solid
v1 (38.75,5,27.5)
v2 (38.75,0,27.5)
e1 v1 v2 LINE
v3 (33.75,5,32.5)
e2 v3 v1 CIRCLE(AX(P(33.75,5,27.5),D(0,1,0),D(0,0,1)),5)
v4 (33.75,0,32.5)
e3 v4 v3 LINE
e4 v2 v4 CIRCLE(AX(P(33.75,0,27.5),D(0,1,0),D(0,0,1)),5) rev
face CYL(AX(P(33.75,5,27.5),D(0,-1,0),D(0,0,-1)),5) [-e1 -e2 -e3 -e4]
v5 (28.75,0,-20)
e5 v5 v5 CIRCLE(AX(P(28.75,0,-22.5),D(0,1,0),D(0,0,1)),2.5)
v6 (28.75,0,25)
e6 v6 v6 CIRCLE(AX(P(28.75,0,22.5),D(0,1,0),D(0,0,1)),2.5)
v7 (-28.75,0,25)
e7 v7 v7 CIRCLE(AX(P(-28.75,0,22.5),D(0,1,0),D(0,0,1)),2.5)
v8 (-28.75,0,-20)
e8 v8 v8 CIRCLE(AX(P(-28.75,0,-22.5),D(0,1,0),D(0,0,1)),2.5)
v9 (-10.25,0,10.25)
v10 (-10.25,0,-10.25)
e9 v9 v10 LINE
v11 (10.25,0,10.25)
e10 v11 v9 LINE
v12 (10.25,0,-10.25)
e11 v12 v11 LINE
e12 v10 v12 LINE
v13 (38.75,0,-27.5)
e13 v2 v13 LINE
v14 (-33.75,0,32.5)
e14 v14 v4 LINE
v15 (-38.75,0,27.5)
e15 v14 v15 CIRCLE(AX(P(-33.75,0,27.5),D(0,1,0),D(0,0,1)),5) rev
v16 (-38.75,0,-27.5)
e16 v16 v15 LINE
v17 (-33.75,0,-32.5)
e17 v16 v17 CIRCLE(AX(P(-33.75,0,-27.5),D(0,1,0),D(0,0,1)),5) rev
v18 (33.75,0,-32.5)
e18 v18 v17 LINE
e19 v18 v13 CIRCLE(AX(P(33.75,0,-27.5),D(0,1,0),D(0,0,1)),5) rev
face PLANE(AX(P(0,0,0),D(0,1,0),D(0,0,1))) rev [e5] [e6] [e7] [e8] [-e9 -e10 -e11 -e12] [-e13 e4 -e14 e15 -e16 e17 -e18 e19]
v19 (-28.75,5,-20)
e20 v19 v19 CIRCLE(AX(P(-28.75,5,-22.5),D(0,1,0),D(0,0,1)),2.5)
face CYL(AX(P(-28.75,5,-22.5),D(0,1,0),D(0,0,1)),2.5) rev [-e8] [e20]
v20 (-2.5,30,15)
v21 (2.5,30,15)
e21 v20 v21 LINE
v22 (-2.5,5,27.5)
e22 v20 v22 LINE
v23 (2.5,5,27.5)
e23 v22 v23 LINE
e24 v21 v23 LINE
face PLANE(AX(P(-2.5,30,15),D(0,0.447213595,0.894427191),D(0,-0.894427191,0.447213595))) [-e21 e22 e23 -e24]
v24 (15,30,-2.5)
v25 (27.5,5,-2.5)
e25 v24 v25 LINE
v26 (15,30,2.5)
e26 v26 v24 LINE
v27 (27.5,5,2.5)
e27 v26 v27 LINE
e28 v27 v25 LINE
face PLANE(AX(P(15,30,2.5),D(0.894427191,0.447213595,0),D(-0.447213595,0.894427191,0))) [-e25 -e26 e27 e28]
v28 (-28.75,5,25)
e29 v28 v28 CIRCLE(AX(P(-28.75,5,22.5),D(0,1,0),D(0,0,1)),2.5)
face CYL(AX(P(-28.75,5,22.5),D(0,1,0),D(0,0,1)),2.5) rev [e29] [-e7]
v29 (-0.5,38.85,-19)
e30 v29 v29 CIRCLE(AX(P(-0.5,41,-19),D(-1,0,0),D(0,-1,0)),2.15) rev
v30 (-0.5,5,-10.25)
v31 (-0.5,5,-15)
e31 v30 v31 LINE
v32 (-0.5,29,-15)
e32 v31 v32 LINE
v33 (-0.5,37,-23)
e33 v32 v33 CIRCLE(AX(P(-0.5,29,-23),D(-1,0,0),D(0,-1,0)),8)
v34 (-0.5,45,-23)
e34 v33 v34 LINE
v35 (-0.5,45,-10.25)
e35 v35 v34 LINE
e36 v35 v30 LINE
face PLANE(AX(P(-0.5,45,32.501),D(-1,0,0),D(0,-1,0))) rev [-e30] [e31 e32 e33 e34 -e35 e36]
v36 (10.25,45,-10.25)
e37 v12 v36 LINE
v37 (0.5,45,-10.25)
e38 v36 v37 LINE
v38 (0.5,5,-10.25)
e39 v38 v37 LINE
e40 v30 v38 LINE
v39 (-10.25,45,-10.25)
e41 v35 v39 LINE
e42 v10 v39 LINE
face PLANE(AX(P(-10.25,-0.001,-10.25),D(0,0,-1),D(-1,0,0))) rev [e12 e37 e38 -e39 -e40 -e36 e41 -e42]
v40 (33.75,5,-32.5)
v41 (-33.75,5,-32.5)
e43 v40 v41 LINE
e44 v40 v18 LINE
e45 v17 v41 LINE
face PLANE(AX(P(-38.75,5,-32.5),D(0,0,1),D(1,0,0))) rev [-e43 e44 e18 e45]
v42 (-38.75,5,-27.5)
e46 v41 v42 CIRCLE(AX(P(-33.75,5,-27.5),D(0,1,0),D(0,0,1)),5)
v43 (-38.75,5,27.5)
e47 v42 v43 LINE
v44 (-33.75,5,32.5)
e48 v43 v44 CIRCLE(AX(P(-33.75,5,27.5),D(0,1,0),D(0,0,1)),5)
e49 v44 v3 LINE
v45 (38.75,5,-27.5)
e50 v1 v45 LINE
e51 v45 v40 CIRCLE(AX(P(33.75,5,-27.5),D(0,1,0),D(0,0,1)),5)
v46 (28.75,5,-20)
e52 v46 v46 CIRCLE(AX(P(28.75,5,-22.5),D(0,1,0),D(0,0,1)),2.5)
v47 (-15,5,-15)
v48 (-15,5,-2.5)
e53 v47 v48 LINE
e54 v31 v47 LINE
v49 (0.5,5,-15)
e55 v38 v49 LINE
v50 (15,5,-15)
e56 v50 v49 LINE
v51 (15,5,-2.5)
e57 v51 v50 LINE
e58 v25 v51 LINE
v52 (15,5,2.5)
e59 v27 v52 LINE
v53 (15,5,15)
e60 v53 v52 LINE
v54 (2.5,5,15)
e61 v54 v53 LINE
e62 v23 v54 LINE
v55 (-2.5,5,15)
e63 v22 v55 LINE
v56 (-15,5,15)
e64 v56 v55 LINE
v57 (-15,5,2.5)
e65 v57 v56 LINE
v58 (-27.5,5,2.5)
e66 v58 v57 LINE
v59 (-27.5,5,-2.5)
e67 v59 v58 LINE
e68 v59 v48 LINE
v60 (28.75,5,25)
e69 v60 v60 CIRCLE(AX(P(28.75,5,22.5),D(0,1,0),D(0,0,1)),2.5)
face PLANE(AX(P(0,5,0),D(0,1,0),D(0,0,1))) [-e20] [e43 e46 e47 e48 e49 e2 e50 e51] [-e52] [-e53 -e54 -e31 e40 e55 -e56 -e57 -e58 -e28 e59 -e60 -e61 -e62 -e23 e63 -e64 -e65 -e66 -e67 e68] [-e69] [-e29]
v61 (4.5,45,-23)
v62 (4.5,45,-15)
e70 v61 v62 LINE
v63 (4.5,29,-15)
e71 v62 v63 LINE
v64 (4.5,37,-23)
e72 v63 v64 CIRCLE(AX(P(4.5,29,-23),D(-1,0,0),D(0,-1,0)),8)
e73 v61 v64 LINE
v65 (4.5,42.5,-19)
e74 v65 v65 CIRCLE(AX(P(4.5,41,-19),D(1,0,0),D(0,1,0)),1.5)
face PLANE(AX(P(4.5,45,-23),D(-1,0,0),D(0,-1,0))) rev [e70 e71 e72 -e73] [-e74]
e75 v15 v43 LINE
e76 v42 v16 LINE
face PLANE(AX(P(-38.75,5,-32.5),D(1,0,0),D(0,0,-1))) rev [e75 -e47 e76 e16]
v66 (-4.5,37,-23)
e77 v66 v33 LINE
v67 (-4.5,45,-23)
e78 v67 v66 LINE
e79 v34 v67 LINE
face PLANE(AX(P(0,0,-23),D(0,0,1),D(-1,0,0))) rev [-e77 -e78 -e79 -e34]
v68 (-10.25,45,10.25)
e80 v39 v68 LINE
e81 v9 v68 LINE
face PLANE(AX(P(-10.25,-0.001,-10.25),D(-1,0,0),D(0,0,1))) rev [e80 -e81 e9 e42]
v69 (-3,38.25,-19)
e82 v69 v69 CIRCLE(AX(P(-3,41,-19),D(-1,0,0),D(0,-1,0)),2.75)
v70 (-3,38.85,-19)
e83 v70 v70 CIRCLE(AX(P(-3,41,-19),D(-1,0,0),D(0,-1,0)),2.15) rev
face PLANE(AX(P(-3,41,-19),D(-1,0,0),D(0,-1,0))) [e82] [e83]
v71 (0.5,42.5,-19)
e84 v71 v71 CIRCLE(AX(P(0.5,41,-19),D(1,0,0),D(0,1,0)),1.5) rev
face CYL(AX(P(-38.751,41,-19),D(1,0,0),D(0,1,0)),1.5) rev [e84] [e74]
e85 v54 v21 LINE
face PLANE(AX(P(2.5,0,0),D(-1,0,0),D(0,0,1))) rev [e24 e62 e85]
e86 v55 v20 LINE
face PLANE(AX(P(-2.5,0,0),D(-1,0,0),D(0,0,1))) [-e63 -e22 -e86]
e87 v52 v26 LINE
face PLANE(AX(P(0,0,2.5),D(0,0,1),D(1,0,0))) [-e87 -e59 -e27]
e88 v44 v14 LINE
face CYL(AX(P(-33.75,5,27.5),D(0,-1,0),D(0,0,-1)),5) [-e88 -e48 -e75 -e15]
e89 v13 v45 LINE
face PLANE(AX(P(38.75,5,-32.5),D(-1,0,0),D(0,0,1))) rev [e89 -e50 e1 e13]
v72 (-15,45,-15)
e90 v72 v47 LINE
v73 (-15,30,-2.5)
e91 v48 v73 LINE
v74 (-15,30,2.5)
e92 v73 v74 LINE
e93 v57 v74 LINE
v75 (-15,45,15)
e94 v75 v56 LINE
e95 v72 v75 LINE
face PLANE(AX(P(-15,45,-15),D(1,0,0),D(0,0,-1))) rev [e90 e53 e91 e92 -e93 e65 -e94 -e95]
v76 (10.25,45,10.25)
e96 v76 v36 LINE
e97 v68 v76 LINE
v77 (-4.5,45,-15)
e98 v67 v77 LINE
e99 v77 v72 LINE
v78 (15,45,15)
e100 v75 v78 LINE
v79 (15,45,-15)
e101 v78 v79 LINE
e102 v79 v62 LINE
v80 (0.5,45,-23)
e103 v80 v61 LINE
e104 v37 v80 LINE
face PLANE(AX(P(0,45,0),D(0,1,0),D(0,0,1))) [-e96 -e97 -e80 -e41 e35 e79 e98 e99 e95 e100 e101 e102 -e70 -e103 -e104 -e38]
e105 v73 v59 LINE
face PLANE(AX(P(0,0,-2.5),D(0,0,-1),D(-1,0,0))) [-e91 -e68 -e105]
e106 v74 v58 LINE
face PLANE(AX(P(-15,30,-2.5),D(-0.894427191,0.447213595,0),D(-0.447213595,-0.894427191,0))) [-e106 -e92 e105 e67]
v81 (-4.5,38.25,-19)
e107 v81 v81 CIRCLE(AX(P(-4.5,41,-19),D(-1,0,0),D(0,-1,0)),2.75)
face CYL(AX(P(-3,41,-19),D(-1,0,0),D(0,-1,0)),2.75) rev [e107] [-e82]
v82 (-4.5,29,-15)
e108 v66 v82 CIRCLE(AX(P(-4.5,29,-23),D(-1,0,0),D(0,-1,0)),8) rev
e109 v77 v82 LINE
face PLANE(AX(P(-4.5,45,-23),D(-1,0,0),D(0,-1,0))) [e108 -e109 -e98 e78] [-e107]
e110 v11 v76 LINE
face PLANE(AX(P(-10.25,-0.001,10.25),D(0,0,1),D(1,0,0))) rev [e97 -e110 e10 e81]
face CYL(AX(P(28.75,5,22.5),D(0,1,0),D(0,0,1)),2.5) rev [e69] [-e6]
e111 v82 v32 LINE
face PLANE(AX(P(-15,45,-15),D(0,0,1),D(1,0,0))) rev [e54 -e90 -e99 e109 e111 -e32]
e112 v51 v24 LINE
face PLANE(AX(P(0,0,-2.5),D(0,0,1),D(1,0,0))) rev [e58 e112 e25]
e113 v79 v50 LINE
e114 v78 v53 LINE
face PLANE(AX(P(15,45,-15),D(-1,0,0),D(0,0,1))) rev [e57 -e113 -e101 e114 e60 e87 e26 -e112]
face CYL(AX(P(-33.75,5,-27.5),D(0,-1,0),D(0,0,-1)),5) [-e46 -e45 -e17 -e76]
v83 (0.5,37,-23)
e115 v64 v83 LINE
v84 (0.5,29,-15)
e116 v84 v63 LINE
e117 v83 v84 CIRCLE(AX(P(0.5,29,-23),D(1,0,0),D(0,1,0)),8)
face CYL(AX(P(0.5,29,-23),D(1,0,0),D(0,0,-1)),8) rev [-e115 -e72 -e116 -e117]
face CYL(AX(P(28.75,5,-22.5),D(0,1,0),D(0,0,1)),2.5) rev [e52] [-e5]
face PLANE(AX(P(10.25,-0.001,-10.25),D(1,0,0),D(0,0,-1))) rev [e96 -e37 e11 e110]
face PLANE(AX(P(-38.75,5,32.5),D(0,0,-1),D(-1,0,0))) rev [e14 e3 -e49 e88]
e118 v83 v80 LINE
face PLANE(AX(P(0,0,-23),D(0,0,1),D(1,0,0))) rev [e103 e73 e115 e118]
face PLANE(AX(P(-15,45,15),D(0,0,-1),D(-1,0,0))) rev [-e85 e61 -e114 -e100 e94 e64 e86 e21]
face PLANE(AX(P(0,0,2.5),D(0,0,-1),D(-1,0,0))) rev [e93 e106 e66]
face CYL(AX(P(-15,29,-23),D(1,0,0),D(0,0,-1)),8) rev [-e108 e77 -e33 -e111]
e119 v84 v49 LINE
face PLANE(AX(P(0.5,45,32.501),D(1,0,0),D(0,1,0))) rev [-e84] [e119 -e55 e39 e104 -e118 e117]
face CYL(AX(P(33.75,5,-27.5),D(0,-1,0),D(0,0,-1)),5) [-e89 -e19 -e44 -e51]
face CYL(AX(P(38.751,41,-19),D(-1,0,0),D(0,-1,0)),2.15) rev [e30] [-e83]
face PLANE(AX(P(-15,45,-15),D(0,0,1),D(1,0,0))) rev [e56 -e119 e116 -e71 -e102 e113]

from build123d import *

# Parameters (mm, degrees)
SKETCH1_W                = 77.5
SKETCH1_H                = 65
BOSS_EXTRUDE1_DEPTH      = 5
F_5_0_5_DIAMETER_HOLE1_D = 5
SKETCH4_W                = 30
SKETCH4_H                = 30
BOSS_EXTRUDE2_DEPTH      = 40
CUT_EXTRUDE1_REACH       = 69.696
SKETCH5_W                = 20.5
SKETCH5_H                = 20.5
BOSS_EXTRUDE3_DEPTH      = 2.5
CIRPATTERN1_COUNT        = 2
CIRPATTERN1_ANGLE        = 90
CIRPATTERN2_COUNT        = 2
CIRPATTERN2_ANGLE        = 90
CUT_EXTRUDE4_REACH       = 78.045
SKETCH11_W               = 1
SKETCH11_H               = 40
SKETCH12_W               = 4
SKETCH12_H               = 8
BOSS_EXTRUDE5_DEPTH      = 8
FILLET3_R                = 8
FILLET3_OF_MIRROR2_R     = 8
CUT_EXTRUDE5_REACH       = 72.369
SKETCH13_R               = 2.15
SKETCH14_R               = 2.75
CUT_EXTRUDE6_DEPTH       = 1.5
CUT_EXTRUDE7_REACH       = 72.369
SKETCH15_R               = 1.5
FILLET1_R                = 5


with BuildPart() as part:
    # Sketch1 → Boss-Extrude1 (new body)
    with BuildSketch(Plane(origin=(0, 0, 0), x_dir=(1, 0, 0), z_dir=(0, 1, 0))):
        Rectangle(SKETCH1_W, SKETCH1_H)
    extrude(amount=BOSS_EXTRUDE1_DEPTH)

    # Ø5.0 (5) Diameter Hole1 (through all)
    with Locations(Plane(origin=(-28.75, 5, -22.5), x_dir=(0, 0, 1), z_dir=(0, 1, 0))):
        with Locations((0, 0), (0, 57.5), (45, 57.5), (45, 0)):
            Hole(F_5_0_5_DIAMETER_HOLE1_D / 2)

    # Sketch4 → Boss-Extrude2 (add)
    with BuildSketch(Plane(origin=(0, 5, 0), x_dir=(1, 0, 0), z_dir=(0, 1, 0))):
        Rectangle(SKETCH4_W, SKETCH4_H)
    extrude(amount=BOSS_EXTRUDE2_DEPTH)

    # Sketch5 → Cut-Extrude1 (cut, up to next)
    with BuildSketch(Plane(origin=(0, 45, 0), x_dir=(1, 0, 0), z_dir=(0, 1, 0)), mode=Mode.PRIVATE) as cut_extrude1_sk1:
        Rectangle(SKETCH5_W, SKETCH5_H)
    cut_extrude1_tool1 = extrude(cut_extrude1_sk1.sketch, amount=-CUT_EXTRUDE1_REACH, mode=Mode.PRIVATE) & part.part
    add(cut_extrude1_tool1.solids().sort_by_distance((0, 45, 0))[0], mode=Mode.SUBTRACT)

    # Sketch7 → Boss-Extrude3 (add, symmetric)
    with BuildSketch(Plane(origin=(0, 0, 0), x_dir=(0, 0, -1), z_dir=(1, 0, 0))):
        Polygon((-15, 30), (-27.5, 5), (-15, 5), align=None)
    boss_extrude3 = extrude(amount=BOSS_EXTRUDE3_DEPTH, both=True)

    # CirPattern1: Boss-Extrude3 ×2 about axis
    cirpattern1_axis = Axis((0, 0, 0), (0, 1, 0))
    for i in range(1, CIRPATTERN1_COUNT):
        add(boss_extrude3.rotate(cirpattern1_axis, i * CIRPATTERN1_ANGLE / (CIRPATTERN1_COUNT - 1)))

    # CirPattern2: Boss-Extrude3 ×2 about axis
    cirpattern2_axis = Axis((0, 0, 0), (0, -1, 0))
    for i in range(1, CIRPATTERN2_COUNT):
        add(boss_extrude3.rotate(cirpattern2_axis, i * CIRPATTERN2_ANGLE / (CIRPATTERN2_COUNT - 1)))

    # Sketch11 → Cut-Extrude4 (cut, up to next)
    with BuildSketch(Plane(origin=(0, 0, -15), x_dir=(-1, 0, 0), z_dir=(0, 0, -1)), mode=Mode.PRIVATE) as cut_extrude4_sk1:
        with Locations((0, 25)):
            Rectangle(SKETCH11_W, SKETCH11_H)
    cut_extrude4_tool1 = extrude(cut_extrude4_sk1.sketch, amount=-CUT_EXTRUDE4_REACH, mode=Mode.PRIVATE) & part.part
    add(cut_extrude4_tool1.solids().sort_by_distance((0, 25, -15))[0], mode=Mode.SUBTRACT)

    # Sketch12 → Boss-Extrude5 (add)
    with BuildSketch(Plane(origin=(0, 0, -15), x_dir=(-1, 0, 0), z_dir=(0, 0, -1))):
        with Locations((-2.5, 41)):
            Rectangle(SKETCH12_W, SKETCH12_H)
    boss_extrude5 = extrude(amount=BOSS_EXTRUDE5_DEPTH)

    # Fillet3
    fillet3_edges = [part.edges().sort_by_distance(p)[0] for p in [
        (2.5, 37, -15),
    ]]
    fillet(fillet3_edges, radius=FILLET3_R - 0.0001)  # a hair under: the kernel refuses the full size

    # Mirror2: Boss-Extrude5 across plane
    add(boss_extrude5.mirror(Plane(origin=(0, 0, 0), x_dir=(0, 0, 1), z_dir=(1, 0, 0))))

    # Fillet3 of Mirror2
    fillet3_of_mirror2_edges = [part.edges().sort_by_distance(p)[0] for p in [
        (-2.5, 37, -15),
    ]]
    fillet(fillet3_of_mirror2_edges, radius=FILLET3_OF_MIRROR2_R - 0.0001)  # a hair under: the kernel refuses the full size

    # Sketch13 → Cut-Extrude5 (cut, up to next)
    with BuildSketch(Plane.ZY.offset(4.5), mode=Mode.PRIVATE) as cut_extrude5_sk1:
        with Locations(Location((-19, 41, 0), (0, 0, 270))):
            Circle(SKETCH13_R)
    cut_extrude5_tool1 = extrude(cut_extrude5_sk1.sketch, amount=-CUT_EXTRUDE5_REACH, mode=Mode.PRIVATE) & part.part
    add(cut_extrude5_tool1.solids().sort_by_distance((-4.5, 41, -19))[0], mode=Mode.SUBTRACT)

    # Sketch14 → Cut-Extrude6 (cut)
    with BuildSketch(Plane.ZY.offset(4.5)):
        with Locations(Location((-19, 41, 0), (0, 0, 270))):
            Circle(SKETCH14_R)
    extrude(amount=-CUT_EXTRUDE6_DEPTH, mode=Mode.SUBTRACT)

    # Sketch15 → Cut-Extrude7 (cut, up to next)
    with BuildSketch(Plane(origin=(4.5, 0, 0), x_dir=(0, 0, -1), z_dir=(1, 0, 0)), mode=Mode.PRIVATE) as cut_extrude7_sk1:
        with Locations(Location((19, 41, 0), (0, 0, 90))):
            Circle(SKETCH15_R)
    cut_extrude7_tool1 = extrude(cut_extrude7_sk1.sketch, amount=-CUT_EXTRUDE7_REACH, mode=Mode.PRIVATE) & part.part
    add(cut_extrude7_tool1.solids().sort_by_distance((4.5, 41, -19))[0], mode=Mode.SUBTRACT)

    # Fillet1
    fillet1_edges = [part.edges().sort_by_distance(p)[0] for p in [
        (-38.75, 2.5, -32.5),
        (38.75, 2.5, -32.5),
        (38.75, 2.5, 32.5),
        (-38.75, 2.5, 32.5),
    ]]
    fillet(fillet1_edges, radius=FILLET1_R)


solid = part.part
